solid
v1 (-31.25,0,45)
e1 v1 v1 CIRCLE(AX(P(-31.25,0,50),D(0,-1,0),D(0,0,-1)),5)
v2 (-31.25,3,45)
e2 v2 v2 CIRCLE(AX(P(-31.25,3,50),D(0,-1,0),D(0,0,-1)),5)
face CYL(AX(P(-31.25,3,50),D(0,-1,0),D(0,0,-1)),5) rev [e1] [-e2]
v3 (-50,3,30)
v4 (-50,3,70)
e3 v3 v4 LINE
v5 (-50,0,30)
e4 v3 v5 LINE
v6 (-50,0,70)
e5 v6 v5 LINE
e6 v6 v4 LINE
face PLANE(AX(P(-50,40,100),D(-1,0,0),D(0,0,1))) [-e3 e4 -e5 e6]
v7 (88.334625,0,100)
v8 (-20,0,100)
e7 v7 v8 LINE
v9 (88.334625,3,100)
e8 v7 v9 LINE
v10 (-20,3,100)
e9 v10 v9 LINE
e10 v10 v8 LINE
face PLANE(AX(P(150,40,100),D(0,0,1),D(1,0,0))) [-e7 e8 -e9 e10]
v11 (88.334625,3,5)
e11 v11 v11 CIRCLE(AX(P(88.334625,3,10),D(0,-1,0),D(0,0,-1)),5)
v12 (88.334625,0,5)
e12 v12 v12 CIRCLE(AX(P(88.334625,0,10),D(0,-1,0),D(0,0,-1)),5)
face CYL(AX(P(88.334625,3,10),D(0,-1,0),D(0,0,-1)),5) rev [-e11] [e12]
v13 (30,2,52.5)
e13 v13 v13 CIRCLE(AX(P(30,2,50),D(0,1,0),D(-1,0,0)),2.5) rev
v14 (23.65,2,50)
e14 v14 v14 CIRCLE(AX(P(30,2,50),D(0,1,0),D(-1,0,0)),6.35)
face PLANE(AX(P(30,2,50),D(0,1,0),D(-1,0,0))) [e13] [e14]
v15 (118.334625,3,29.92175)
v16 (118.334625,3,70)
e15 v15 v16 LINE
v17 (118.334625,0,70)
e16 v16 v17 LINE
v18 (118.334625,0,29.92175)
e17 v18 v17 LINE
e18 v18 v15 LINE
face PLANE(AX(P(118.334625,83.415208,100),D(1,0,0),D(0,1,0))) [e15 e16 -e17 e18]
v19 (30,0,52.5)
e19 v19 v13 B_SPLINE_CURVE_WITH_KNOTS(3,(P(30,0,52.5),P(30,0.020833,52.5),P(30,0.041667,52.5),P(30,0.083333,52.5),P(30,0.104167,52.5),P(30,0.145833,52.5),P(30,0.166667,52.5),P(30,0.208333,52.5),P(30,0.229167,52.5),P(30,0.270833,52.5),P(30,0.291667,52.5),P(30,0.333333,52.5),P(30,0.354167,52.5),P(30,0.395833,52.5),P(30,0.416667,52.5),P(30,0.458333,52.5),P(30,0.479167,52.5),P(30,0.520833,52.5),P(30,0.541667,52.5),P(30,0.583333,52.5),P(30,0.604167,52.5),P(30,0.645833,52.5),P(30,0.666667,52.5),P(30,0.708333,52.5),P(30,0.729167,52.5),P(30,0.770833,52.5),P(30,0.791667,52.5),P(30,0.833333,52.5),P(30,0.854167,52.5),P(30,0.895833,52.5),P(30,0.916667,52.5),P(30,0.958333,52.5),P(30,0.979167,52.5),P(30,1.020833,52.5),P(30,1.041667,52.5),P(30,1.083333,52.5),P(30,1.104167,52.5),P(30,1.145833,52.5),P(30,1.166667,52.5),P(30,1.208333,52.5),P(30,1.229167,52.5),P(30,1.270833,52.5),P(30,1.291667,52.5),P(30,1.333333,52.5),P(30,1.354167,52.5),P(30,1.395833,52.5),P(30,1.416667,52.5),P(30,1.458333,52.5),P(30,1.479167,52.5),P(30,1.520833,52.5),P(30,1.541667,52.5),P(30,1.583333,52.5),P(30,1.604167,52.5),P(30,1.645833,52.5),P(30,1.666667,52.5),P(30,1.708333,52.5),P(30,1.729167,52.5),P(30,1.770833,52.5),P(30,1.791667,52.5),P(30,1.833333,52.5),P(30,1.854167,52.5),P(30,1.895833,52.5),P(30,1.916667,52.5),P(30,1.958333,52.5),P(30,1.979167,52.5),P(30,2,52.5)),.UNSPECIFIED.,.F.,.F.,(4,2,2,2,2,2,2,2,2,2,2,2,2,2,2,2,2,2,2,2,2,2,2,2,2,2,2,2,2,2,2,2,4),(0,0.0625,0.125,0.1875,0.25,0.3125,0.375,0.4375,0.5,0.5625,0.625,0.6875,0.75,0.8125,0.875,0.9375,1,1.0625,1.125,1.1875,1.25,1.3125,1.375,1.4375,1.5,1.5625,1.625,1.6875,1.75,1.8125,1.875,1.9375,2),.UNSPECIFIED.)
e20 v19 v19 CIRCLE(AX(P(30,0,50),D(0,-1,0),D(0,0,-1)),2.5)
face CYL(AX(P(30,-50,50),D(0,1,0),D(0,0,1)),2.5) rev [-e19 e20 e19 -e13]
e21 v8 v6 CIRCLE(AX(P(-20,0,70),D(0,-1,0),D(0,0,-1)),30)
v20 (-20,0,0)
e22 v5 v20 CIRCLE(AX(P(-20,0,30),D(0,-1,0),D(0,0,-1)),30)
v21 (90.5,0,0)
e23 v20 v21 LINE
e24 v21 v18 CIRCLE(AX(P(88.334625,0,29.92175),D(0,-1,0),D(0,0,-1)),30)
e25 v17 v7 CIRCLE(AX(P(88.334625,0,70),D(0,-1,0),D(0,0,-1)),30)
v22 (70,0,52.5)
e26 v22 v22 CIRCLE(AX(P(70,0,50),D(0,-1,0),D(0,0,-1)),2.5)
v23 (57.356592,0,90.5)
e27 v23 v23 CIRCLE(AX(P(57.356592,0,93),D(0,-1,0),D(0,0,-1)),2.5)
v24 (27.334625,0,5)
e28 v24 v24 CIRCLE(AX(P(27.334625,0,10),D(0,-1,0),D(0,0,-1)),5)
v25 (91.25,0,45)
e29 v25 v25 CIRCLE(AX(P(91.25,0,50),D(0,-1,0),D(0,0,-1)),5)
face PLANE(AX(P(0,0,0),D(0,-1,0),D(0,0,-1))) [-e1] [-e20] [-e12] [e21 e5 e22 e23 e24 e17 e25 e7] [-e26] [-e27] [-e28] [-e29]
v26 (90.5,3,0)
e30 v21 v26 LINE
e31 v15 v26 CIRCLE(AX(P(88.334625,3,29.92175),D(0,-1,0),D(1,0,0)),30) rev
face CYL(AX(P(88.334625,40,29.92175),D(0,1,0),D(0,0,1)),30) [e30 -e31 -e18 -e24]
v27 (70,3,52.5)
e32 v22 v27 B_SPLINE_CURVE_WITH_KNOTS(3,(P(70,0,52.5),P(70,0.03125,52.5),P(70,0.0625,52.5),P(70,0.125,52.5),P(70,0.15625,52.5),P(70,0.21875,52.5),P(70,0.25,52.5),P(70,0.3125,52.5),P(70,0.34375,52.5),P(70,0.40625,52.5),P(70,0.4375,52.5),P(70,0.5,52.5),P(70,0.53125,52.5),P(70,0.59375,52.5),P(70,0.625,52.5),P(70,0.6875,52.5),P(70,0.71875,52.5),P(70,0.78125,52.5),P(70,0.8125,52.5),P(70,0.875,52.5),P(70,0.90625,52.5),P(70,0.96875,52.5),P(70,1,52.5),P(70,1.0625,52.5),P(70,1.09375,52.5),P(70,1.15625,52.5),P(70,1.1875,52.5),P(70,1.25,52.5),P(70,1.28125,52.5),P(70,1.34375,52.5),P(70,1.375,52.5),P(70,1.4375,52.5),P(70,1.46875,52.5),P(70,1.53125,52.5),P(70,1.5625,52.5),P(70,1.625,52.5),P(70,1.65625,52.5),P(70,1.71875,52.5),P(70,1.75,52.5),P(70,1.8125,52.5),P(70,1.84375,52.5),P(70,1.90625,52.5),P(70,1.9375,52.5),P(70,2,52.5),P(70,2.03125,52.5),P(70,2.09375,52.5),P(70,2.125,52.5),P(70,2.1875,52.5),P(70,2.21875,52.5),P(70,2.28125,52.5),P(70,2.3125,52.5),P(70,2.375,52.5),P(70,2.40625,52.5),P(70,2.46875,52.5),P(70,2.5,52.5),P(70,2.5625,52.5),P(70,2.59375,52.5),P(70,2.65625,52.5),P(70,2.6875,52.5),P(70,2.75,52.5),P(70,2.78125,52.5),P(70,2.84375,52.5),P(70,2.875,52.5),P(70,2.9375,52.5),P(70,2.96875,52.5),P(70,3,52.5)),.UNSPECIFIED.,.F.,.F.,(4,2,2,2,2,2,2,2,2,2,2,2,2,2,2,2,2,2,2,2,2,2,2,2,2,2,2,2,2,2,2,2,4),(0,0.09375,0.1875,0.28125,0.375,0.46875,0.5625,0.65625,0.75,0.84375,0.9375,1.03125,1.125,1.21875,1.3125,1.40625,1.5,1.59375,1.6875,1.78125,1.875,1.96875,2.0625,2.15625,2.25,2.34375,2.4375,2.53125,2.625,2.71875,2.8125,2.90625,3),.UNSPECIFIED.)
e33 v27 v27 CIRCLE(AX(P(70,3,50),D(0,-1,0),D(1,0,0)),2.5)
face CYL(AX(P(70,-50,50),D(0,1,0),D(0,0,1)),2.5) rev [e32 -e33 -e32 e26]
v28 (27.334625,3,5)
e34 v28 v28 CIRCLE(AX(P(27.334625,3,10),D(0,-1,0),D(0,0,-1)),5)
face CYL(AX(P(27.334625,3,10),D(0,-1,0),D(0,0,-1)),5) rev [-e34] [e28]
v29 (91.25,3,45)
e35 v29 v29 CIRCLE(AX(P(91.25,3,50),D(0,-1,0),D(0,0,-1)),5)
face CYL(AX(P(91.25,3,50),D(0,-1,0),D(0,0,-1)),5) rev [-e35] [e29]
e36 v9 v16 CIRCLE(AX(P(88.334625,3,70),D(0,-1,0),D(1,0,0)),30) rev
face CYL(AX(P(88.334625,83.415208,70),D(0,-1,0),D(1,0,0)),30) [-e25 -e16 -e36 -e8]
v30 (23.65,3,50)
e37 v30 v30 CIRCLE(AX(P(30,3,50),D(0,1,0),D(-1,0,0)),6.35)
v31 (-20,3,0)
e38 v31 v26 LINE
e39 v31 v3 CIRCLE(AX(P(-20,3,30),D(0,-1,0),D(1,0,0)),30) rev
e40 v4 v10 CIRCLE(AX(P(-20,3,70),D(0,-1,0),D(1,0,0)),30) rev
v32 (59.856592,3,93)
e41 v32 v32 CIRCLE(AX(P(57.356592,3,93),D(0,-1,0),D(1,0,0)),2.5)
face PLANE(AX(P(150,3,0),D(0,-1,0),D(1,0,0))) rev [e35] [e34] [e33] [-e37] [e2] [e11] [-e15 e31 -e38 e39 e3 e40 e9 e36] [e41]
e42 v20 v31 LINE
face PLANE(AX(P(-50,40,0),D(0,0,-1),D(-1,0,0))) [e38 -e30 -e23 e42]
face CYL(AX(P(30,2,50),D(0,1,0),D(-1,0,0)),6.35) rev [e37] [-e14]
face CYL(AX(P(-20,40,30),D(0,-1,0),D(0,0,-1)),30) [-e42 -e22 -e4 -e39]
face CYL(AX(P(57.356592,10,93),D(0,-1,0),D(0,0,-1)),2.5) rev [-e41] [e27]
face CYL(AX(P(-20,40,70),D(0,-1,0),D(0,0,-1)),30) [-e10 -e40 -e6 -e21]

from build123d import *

# Parameters (mm, degrees)
EXTRUDE_1_DEPTH           = 50
EXTRUDE_1_DEPTH_BACK      = 50
SKETCH_2_W                = 200
SKETCH_2_H                = 100
EXTRUDE_2_DEPTH           = 40
SKETCH_3_W                = 200
SKETCH_3_H                = 34
CUT_EXTRUDE_1_DEPTH       = 100
CUT_EXTRUDE_2_DEPTH       = 279.66871012
SKETCH_8_R                = 2.5
CUT_EXTRUDE_4_DEPTH       = 276.238532913
SKETCH_10_R               = 5
CUT_EXTRUDE_5_DEPTH       = 260.608358879
EXTRUDE_5_DEPTH           = 10
SKETCH_13_W               = 74.115787845
SKETCH_13_H               = 3
EXTRUDE_7_DEPTH           = 81
SKETCH_14_W               = 207.5
SKETCH_14_H               = 100
EXTRUDE_8_DEPTH           = 7
EXTRUDE_9_DEPTH           = 10
SKETCH_17_R               = 6.35
CUT_EXTRUDE_6_DEPTH       = 1
CUT_EXTRUDE_START         = -1
SKETCH_18_R               = 6.35
CUT_EXTRUDE_7_DEPTH       = 1
SKETCH_20_R               = 5
CUT_EXTRUDE_8_DEPTH       = 3
CUT_EXTRUDE_9_DEPTH       = 273.255129638
CUT_EXTRUDE_9_DEPTH_BACK  = 273.255129638
SKETCH_21_W               = 31.665374736
SKETCH_21_H               = 100
SKETCH_22_R               = 5
EXTRUDE_10_DEPTH          = 37
FILLET_1_R                = 30
FILLET_2_R                = 30
CUT_EXTRUDE_10_DEPTH      = 248.444254611
CUT_EXTRUDE_10_DEPTH_BACK = 248.444254611
CUT_EXTRUDE_11_DEPTH      = 211.689689342
CUT_EXTRUDE_11_DEPTH_BACK = 211.689689342
CUT_EXTRUDE_12_DEPTH      = 174.368632309
CUT_EXTRUDE_12_DEPTH_BACK = 174.368632309
SKETCH_26_R               = 5
CUT_EXTRUDE_13_DEPTH      = 153.295269567
CUT_EXTRUDE_13_DEPTH_BACK = 153.295269567
CUT_EXTRUDE_14_DEPTH      = 160.286168691
CUT_EXTRUDE_14_DEPTH_BACK = 160.286168691
SKETCH_30_R               = 7.5
CUT_EXTRUDE_15_DEPTH      = 160.286168691
CUT_EXTRUDE_15_DEPTH_BACK = 160.286168691
SKETCH_31_R               = 7.5
SKETCH_32_R               = 7.5
SKETCH_32_R_2             = 5
EXTRUDE_12_DEPTH          = 3
SKETCH_33_R               = 7.5
SKETCH_33_R_2             = 5
EXTRUDE_13_DEPTH          = 3
SKETCH_34_R               = 5
EXTRUDE_14_DEPTH          = 45
CUT_EXTRUDE_19_DEPTH      = 178.031776809
CUT_EXTRUDE_19_DEPTH_BACK = 178.031776809
SKETCH_41_W               = 127.955451874
SKETCH_41_H               = 44.187888027
CUT_EXTRUDE_20_DEPTH      = 173.639074372
CUT_EXTRUDE_20_DEPTH_BACK = 173.639074372
SKETCH_42_W               = 60.696300107
SKETCH_42_H               = 16.694862056
SKETCH_44_R               = 2.5
CUT_EXTRUDE_21_DEPTH      = 10


with BuildPart() as part:
    # 草图1 → 凸台-拉伸1 (new, two sides: drawn at the far end of the back side and taken through both)
    with BuildSketch(Plane(origin=(0, 0, 0), x_dir=(1, 0, 0), z_dir=(0, 1, 0)).offset(-EXTRUDE_1_DEPTH_BACK)):
        Polygon((9.5, 12.5), (9.5, 0), (90.5, 0), (90.5, 12.5), (90.5, 212.5), (9.5, 212.5), align=None)
    extrude(amount=EXTRUDE_1_DEPTH + EXTRUDE_1_DEPTH_BACK)

    # 草图2 → 凸台-拉伸2 (add)
    with BuildSketch(Plane(origin=(0, 0, 0), x_dir=(-1, 0, 0), z_dir=(0, -1, 0))):
        with Locations((-50, -50)):
            Rectangle(SKETCH_2_W, SKETCH_2_H)
    extrude(amount=-EXTRUDE_2_DEPTH)

    # 草图3 → 切除-拉伸1 (cut)
    with BuildSketch(Plane.XY.offset(100)):
        with Locations((50, 20)):
            Rectangle(SKETCH_3_W, SKETCH_3_H)
    extrude(amount=-CUT_EXTRUDE_1_DEPTH, mode=Mode.SUBTRACT)

    # 草图6 → 切除-拉伸2 (cut, through all)
    with BuildSketch(Plane(origin=(0, 50, 0), x_dir=(1, 0, 0), z_dir=(0, 1, 0))):
        Polygon((12.5, 905.325014188), (12.5, 212.5), (12.5, 5), (87.5, 5), (87.5, 212.5), (87.5, 905.325014188), (87.5, 2290.975042562), (12.5, 2290.975042562), align=None)
    extrude(amount=-CUT_EXTRUDE_2_DEPTH, mode=Mode.SUBTRACT)

    # 草图8 → 切除-拉伸4 (cut, through all)
    with BuildSketch(Plane(origin=(0, 40, 0), x_dir=(1, 0, 0), z_dir=(0, 1, 0))):
        with Locations(Location((70, -50, 0), (0, 0, 270))):
            Circle(SKETCH_8_R)
        with Locations(Location((30, -50, 0), (0, 0, 270))):
            Circle(SKETCH_8_R)
    extrude(amount=-CUT_EXTRUDE_4_DEPTH, mode=Mode.SUBTRACT)

    # 草图10 → 切除-拉伸5 (cut, through all)
    with BuildSketch(Plane(origin=(90.5, 0, 0), x_dir=(0, 0, -1), z_dir=(1, 0, 0))):
        with Locations((80, 0)):
            Circle(SKETCH_10_R)
        with Locations((180, 0)):
            Circle(SKETCH_10_R)
    extrude(amount=-CUT_EXTRUDE_5_DEPTH, mode=Mode.SUBTRACT)

    # 草图11 → 凸台-拉伸5 (add)
    with BuildSketch(Plane.ZY.offset(-9.5)):
        Polygon((-30.905613639, 83.415207604), (-74.094429483, 50), (0, 50), (0, 40), (83.32101017, 40), align=None)
    extrude(amount=-EXTRUDE_5_DEPTH)

    # 草图13 → 凸台-拉伸7 (add)
    with BuildSketch(Plane(origin=(90.5, 0, 0), x_dir=(0, 0, -1), z_dir=(1, 0, 0))):
        with Locations((37.057893922, 51.5)):
            Rectangle(SKETCH_13_W, SKETCH_13_H)
    extrude(amount=-EXTRUDE_7_DEPTH)

    # 草图14 → 凸台-拉伸8 (add)
    with BuildSketch(Plane(origin=(12.5, 0, 0), x_dir=(0, 0, -1), z_dir=(1, 0, 0))):
        with Locations((108.75, 0)):
            Rectangle(SKETCH_14_W, SKETCH_14_H)
    extrude(amount=EXTRUDE_8_DEPTH)

    # 草图15 → 凸台-拉伸9 (add)
    with BuildSketch(Plane(origin=(90.5, 0, 0), x_dir=(0, 0, -1), z_dir=(1, 0, 0))):
        Polygon((30.905613639, 83.415207604), (-82.902171575, 40), (0, 40), (0, 53), (70.216960007, 53), align=None)
    extrude(amount=-EXTRUDE_9_DEPTH)

    # 草图17 → 切除-拉伸6 (cut)
    with BuildSketch(Plane(origin=(0, 37, 0), x_dir=(-1, 0, 0), z_dir=(0, -1, 0))):
        with Locations(Location((-30, -50, 0), (0, 0, 90))):
            Circle(SKETCH_17_R)
    extrude(amount=-CUT_EXTRUDE_6_DEPTH, mode=Mode.SUBTRACT)

    # 草图18 → 切除-拉伸7 (cut)
    with BuildSketch(Plane(origin=(0, 3, 0), x_dir=(1, 0, 0), z_dir=(0, 1, 0)).offset(CUT_EXTRUDE_START)):
        with Locations(Location((30, -50, 0), (0, 0, 90))):
            Circle(SKETCH_18_R)
    extrude(amount=CUT_EXTRUDE_7_DEPTH, mode=Mode.SUBTRACT)

    # 草图20 → 切除-拉伸8 (cut)
    with BuildSketch(Plane.XZ):
        with Locations(Location((-31.25, 50, 0), (0, 0, 270))):
            Circle(SKETCH_20_R)
        with Locations(Location((91.25, 50, 0), (0, 0, 270))):
            Circle(SKETCH_20_R)
    extrude(amount=-CUT_EXTRUDE_8_DEPTH, mode=Mode.SUBTRACT)

    # 草图21 → 切除-拉伸9 (cut, two sides: drawn at the far end of the back side and taken through both)
    with BuildSketch(Plane(origin=(0, 3, 0), x_dir=(1, 0, 0), z_dir=(0, 1, 0)).offset(-CUT_EXTRUDE_9_DEPTH_BACK)):
        with Locations((134.167312632, -50)):
            Rectangle(SKETCH_21_W, SKETCH_21_H)
    extrude(amount=CUT_EXTRUDE_9_DEPTH + CUT_EXTRUDE_9_DEPTH_BACK, mode=Mode.SUBTRACT)

    # 草图22 → 凸台-拉伸10 (add)
    with BuildSketch(Plane.XZ):
        with Locations((-28.834995313, 14.93844285)):
            Circle(SKETCH_22_R)
        with Locations((99.943738589, 14.93844285)):
            Circle(SKETCH_22_R)
        with Locations((47.358621855, 88.902784002)):
            Circle(SKETCH_22_R)
    extrude(amount=-EXTRUDE_10_DEPTH)

    # 圆角1
    # the kernel refuses this fillet: 30 mm, written as the material it takes off along each edge
    with BuildSketch(Plane(origin=(-32.536340759, 83.415207604, -30.905613639), x_dir=(0, -0.6119293356637439, -0.7909124402575352), z_dir=(1, 0, 0))) as fillet_1_piece_1:
        with BuildLine():
            CenterArc((FILLET_1_R * 0.560484543454, -FILLET_1_R), FILLET_1_R, 90, 58.539912966)
            Line((-FILLET_1_R * 0.292519393108, -FILLET_1_R * 0.478095521948), (-FILLET_1_R * 0.309579471839, -FILLET_1_R * 0.467657432387))
            Line((-FILLET_1_R * 0.309579471839, -FILLET_1_R * 0.467657432387), (-FILLET_1_R * 0.0112096908691, FILLET_1_R * 0.02))
            Line((-FILLET_1_R * 0.0112096908691, FILLET_1_R * 0.02), (FILLET_1_R * 0.560484543454, FILLET_1_R * 0.02))
            Line((FILLET_1_R * 0.560484543454, FILLET_1_R * 0.02), (FILLET_1_R * 0.560484543454, 0))
        make_face()
    extrude(amount=94.072681518, mode=Mode.SUBTRACT)
    with BuildSketch(Plane(origin=(132.596564701, 83.415207604, -30.905613639), x_dir=(0, -0.6119293356637436, -0.7909124402575354), z_dir=(-1, 0, 0))) as fillet_1_piece_2:
        with BuildLine():
            CenterArc((FILLET_1_R * 0.561287529341, FILLET_1_R), FILLET_1_R, 211.390091687, 58.609908313)
            Line((-FILLET_1_R * 0.292353354769, FILLET_1_R * 0.479137982787), (-FILLET_1_R * 0.309426172451, FILLET_1_R * 0.468720742443))
            Line((-FILLET_1_R * 0.309426172451, FILLET_1_R * 0.468720742443), (-FILLET_1_R * 0.0112257505868, -FILLET_1_R * 0.02))
            Line((-FILLET_1_R * 0.0112257505868, -FILLET_1_R * 0.02), (FILLET_1_R * 0.561287529341, -FILLET_1_R * 0.02))
            Line((FILLET_1_R * 0.561287529341, -FILLET_1_R * 0.02), (FILLET_1_R * 0.561287529341, 0))
        make_face()
    extrude(amount=94.193129401, mode=Mode.SUBTRACT)
    with BuildSketch(Plane(origin=(118.334625264, -38, 100), x_dir=(-1, 0, 0), z_dir=(0, 1, 0)), Plane(origin=(118.334625264, -75, 100), x_dir=(-1, 0, 0), z_dir=(0, 1, 0)), Plane(origin=(-50, -38, 0), x_dir=(1, 0, 0), z_dir=(0, 1, 0)), Plane(origin=(-50, -38, 100), x_dir=(0, 0, -1), z_dir=(0, 1, 0)), Plane(origin=(-50, -75, 100), x_dir=(0, 0, -1), z_dir=(0, 1, 0)), Plane(origin=(-50, -75, 0), x_dir=(1, 0, 0), z_dir=(0, 1, 0))) as fillet_1_piece_3:
        with BuildLine():
            CenterArc((FILLET_1_R, -FILLET_1_R), FILLET_1_R, 90, 90)
            Line((0, -FILLET_1_R), (-FILLET_1_R * 0.02, -FILLET_1_R))
            Line((-FILLET_1_R * 0.02, -FILLET_1_R), (-FILLET_1_R * 0.02, FILLET_1_R * 0.02))
            Line((-FILLET_1_R * 0.02, FILLET_1_R * 0.02), (FILLET_1_R, FILLET_1_R * 0.02))
            Line((FILLET_1_R, FILLET_1_R * 0.02), (FILLET_1_R, 0))
        make_face()
    extrude(amount=153, mode=Mode.SUBTRACT)
    with BuildSketch(Plane(origin=(118.334625264, 114.804376219, 0), x_dir=(0, 0, 1), z_dir=(0, -1, 0))) as fillet_1_piece_4:
        with BuildLine():
            CenterArc((29.921750488, 30), FILLET_1_R, 184.139160489, 85.860839511)
            Line((0, 27.834625264), (-0.59843501, 27.791317769))
            ThreePointArc((-0.59843501, 27.791317769), (-0.6, 13.917312632), (-0.6, 0))
            Line((-0.6, 0), (0, -0.6))
            Line((0, -0.6), (29.921750488, -0.6))
            Line((29.921750488, -0.6), (29.921750488, 0))
        make_face()
    extrude(amount=152.608752439, mode=Mode.SUBTRACT)
    with BuildSketch(Plane(origin=(118.334625264, 77.804376219, 0), x_dir=(-1, 0, 0), z_dir=(0, -1, 0))) as fillet_1_piece_5:
        with BuildLine():
            CenterArc((30, -29.921750488), FILLET_1_R, 94.139160489, 85.860839511)
            Line((0, -29.921750488), (-0.6, -29.921750488))
            Line((-0.6, -29.921750488), (-0.6, 0))
            Line((-0.6, 0), (0, 0.6))
            ThreePointArc((0, 0.6), (13.917312632, 0.6), (27.791317769, 0.59843501))
            Line((27.791317769, 0.59843501), (27.834625264, 0))
        make_face()
    extrude(amount=152.608752439, mode=Mode.SUBTRACT)

    # 圆角2
    fillet_2_edges = [part.edges().sort_by_distance(p)[0] for p in [
        (89, 50, -212.5),
        (89, -50, -212.5),
        (14.5, 50, -212.5),
        (14.5, -50, -212.5),
    ]]
    fillet(fillet_2_edges, radius=FILLET_2_R)

    # 草图23 → 切除-拉伸10 (cut, two sides: drawn at the far end of the back side and taken through both)
    with BuildSketch(Plane(origin=(19.5, 0, 0), x_dir=(0, 0, -1), z_dir=(1, 0, 0)).offset(-CUT_EXTRUDE_10_DEPTH_BACK)):
        Polygon((-82.902171575, 40), (15.172878857, 77.413509693), (30.26062931, 83.169160038), (82.911746167, 53.484816406), (216.982404769, 51.400816531), (216.982404769, -53.030732743), (0, -55.346288159), (0, 40), align=None)
    extrude(amount=CUT_EXTRUDE_10_DEPTH + CUT_EXTRUDE_10_DEPTH_BACK, mode=Mode.SUBTRACT)

    # 草图25 → 切除-拉伸11 (cut, two sides: drawn at the far end of the back side and taken through both)
    with BuildSketch(Plane(origin=(118.334625264, 0, 0), x_dir=(0, 0, -1), z_dir=(1, 0, 0)).offset(-CUT_EXTRUDE_11_DEPTH_BACK)):
        Polygon((-96.999238457, 37), (-5.714105567, 37), (-5.714105567, 3), (-98.622428797, 3), align=None)
    extrude(amount=CUT_EXTRUDE_11_DEPTH + CUT_EXTRUDE_11_DEPTH_BACK, mode=Mode.SUBTRACT)


with BuildPart() as cut_extrude_11_piece_1:
    # of the separate pieces the step leaves, piece 1, a body of its own (cut_extrude_11_pieces)
    add(part.part.solids().sort_by_distance((118.334625264, 37, 70))[0])


with BuildPart() as cut_extrude_11_piece_2:
    # of the separate pieces the step leaves, piece 2, a body of its own (cut_extrude_11_pieces)
    add(part.part.solids().sort_by_distance((-20, 0, 0))[0])


with BuildPart() as cut_extrude_12_tool:
    # 草图26 → 切除-拉伸12 (new, two sides: drawn at the far end of the back side and taken through both)
    with BuildSketch(Plane.XZ.offset(-CUT_EXTRUDE_12_DEPTH_BACK)):
        with Locations(Location((88.334625264, 10, 0), (0, 0, 270))):
            Circle(SKETCH_26_R)
        with Locations(Location((27.334625264, 10, 0), (0, 0, 270))):
            Circle(SKETCH_26_R)
    extrude(amount=CUT_EXTRUDE_12_DEPTH + CUT_EXTRUDE_12_DEPTH_BACK)


with BuildPart() as cut_extrude_11_piece_1_1:
    add(cut_extrude_11_piece_1.part)

    # 切除-拉伸12: cut by cut_extrude_12_tool
    add(cut_extrude_12_tool.part, mode=Mode.SUBTRACT)

    # 草图27 → 切除-拉伸13 (cut, two sides: drawn at the far end of the back side and taken through both)
    with BuildSketch(Plane.ZY.offset(-34.5).offset(-CUT_EXTRUDE_13_DEPTH_BACK)):
        Polygon((-18.94184398, 81.696068066), (-17.663883038, 66.307288383), (80.739109538, 40), (87.341907742, 40), align=None)
    extrude(amount=CUT_EXTRUDE_13_DEPTH + CUT_EXTRUDE_13_DEPTH_BACK, mode=Mode.SUBTRACT)


with BuildPart() as cut_extrude_11_piece_2_1:
    add(cut_extrude_11_piece_2.part)

    # 切除-拉伸12: cut by cut_extrude_12_tool
    add(cut_extrude_12_tool.part, mode=Mode.SUBTRACT)


with BuildPart() as cut_extrude_14_tool:
    # 草图30 → 切除-拉伸14 (new, two sides: drawn at the far end of the back side and taken through both)
    with BuildSketch(Plane.XZ.offset(-37).offset(-CUT_EXTRUDE_14_DEPTH_BACK)):
        with Locations(Location((88.334625264, 10, 0), (0, 0, 270))):
            Circle(SKETCH_30_R)
    extrude(amount=CUT_EXTRUDE_14_DEPTH + CUT_EXTRUDE_14_DEPTH_BACK)


with BuildPart() as cut_extrude_11_piece_1_2:
    add(cut_extrude_11_piece_1_1.part)

    # 切除-拉伸14: cut by cut_extrude_14_tool
    add(cut_extrude_14_tool.part, mode=Mode.SUBTRACT)


with BuildPart() as cut_extrude_11_piece_2_2:
    add(cut_extrude_11_piece_2_1.part)

    # 切除-拉伸14: cut by cut_extrude_14_tool
    add(cut_extrude_14_tool.part, mode=Mode.SUBTRACT)


with BuildPart() as cut_extrude_15_tool:
    # 草图31 → 切除-拉伸15 (new, two sides: drawn at the far end of the back side and taken through both)
    with BuildSketch(Plane.XZ.offset(-37).offset(-CUT_EXTRUDE_15_DEPTH_BACK)):
        with Locations(Location((27.334625264, 10, 0), (0, 0, 270))):
            Circle(SKETCH_31_R)
    extrude(amount=CUT_EXTRUDE_15_DEPTH + CUT_EXTRUDE_15_DEPTH_BACK)


with BuildPart() as cut_extrude_11_piece_1_3:
    add(cut_extrude_11_piece_1_2.part)

    # 切除-拉伸15: cut by cut_extrude_15_tool
    add(cut_extrude_15_tool.part, mode=Mode.SUBTRACT)



with BuildPart() as cut_extrude_11_piece_2_3:
    add(cut_extrude_11_piece_2_2.part)

    # 切除-拉伸15: cut by cut_extrude_15_tool
    add(cut_extrude_15_tool.part, mode=Mode.SUBTRACT)

    # 草图32 → 凸台-拉伸12 (add)
    with BuildSketch(Plane.XZ):
        with Locations(Location((27.334625264, 10, 0), (0, 0, 270))):
            Circle(SKETCH_32_R)
        with Locations(Location((27.334625264, 10, 0), (0, 0, 270))):
            Circle(SKETCH_32_R_2, mode=Mode.SUBTRACT)
    extrude(amount=-EXTRUDE_12_DEPTH)

    # 草图33 → 凸台-拉伸13 (add)
    with BuildSketch(Plane.XZ):
        with Locations(Location((88.334625264, 10, 0), (0, 0, 270))):
            Circle(SKETCH_33_R)
        with Locations(Location((88.334625264, 10, 0), (0, 0, 270))):
            Circle(SKETCH_33_R_2, mode=Mode.SUBTRACT)
    extrude(amount=-EXTRUDE_13_DEPTH)


with BuildPart() as cut_extrude_11_piece_1_4:
    add(cut_extrude_11_piece_1_3.part)

    add(cut_extrude_11_piece_2_3.part)  # 凸台-拉伸14 merges 切除-拉伸11 piece 2
    # 草图34 → 凸台-拉伸14 (add)
    with BuildSketch(Plane.XZ.offset(-37)):
        with Locations(Location((57.356592352, 86.553493229, 0), (0, 0, 90))):
            Circle(SKETCH_34_R)
    extrude(amount=EXTRUDE_14_DEPTH)

    # 草图41 → 切除-拉伸19 (cut, two sides: drawn at the far end of the back side and taken through both)
    with BuildSketch(Plane(origin=(90.5, 0, 0), x_dir=(0, 0, -1), z_dir=(1, 0, 0)).offset(-CUT_EXTRUDE_19_DEPTH_BACK)):
        with Locations((-46.591902261, 25.093944013)):
            Rectangle(SKETCH_41_W, SKETCH_41_H)
    extrude(amount=CUT_EXTRUDE_19_DEPTH + CUT_EXTRUDE_19_DEPTH_BACK, mode=Mode.SUBTRACT)

    # 草图42 → 切除-拉伸20 (cut, two sides: drawn at the far end of the back side and taken through both)
    with BuildSketch(Plane(origin=(90.5, 0, 0), x_dir=(0, 0, -1), z_dir=(1, 0, 0)).offset(-CUT_EXTRUDE_20_DEPTH_BACK)):
        with Locations((-72.283598444, -8.347431028)):
            Rectangle(SKETCH_42_W, SKETCH_42_H)
    extrude(amount=CUT_EXTRUDE_20_DEPTH + CUT_EXTRUDE_20_DEPTH_BACK, mode=Mode.SUBTRACT)

    # 草图44 → 切除-拉伸21 (cut)
    with BuildSketch(Plane.XZ):
        with Locations(Location((57.356592352, 93, 0), (0, 0, 270))):
            Circle(SKETCH_44_R)
    extrude(amount=-CUT_EXTRUDE_21_DEPTH, mode=Mode.SUBTRACT)


solid = cut_extrude_11_piece_1_4.part
